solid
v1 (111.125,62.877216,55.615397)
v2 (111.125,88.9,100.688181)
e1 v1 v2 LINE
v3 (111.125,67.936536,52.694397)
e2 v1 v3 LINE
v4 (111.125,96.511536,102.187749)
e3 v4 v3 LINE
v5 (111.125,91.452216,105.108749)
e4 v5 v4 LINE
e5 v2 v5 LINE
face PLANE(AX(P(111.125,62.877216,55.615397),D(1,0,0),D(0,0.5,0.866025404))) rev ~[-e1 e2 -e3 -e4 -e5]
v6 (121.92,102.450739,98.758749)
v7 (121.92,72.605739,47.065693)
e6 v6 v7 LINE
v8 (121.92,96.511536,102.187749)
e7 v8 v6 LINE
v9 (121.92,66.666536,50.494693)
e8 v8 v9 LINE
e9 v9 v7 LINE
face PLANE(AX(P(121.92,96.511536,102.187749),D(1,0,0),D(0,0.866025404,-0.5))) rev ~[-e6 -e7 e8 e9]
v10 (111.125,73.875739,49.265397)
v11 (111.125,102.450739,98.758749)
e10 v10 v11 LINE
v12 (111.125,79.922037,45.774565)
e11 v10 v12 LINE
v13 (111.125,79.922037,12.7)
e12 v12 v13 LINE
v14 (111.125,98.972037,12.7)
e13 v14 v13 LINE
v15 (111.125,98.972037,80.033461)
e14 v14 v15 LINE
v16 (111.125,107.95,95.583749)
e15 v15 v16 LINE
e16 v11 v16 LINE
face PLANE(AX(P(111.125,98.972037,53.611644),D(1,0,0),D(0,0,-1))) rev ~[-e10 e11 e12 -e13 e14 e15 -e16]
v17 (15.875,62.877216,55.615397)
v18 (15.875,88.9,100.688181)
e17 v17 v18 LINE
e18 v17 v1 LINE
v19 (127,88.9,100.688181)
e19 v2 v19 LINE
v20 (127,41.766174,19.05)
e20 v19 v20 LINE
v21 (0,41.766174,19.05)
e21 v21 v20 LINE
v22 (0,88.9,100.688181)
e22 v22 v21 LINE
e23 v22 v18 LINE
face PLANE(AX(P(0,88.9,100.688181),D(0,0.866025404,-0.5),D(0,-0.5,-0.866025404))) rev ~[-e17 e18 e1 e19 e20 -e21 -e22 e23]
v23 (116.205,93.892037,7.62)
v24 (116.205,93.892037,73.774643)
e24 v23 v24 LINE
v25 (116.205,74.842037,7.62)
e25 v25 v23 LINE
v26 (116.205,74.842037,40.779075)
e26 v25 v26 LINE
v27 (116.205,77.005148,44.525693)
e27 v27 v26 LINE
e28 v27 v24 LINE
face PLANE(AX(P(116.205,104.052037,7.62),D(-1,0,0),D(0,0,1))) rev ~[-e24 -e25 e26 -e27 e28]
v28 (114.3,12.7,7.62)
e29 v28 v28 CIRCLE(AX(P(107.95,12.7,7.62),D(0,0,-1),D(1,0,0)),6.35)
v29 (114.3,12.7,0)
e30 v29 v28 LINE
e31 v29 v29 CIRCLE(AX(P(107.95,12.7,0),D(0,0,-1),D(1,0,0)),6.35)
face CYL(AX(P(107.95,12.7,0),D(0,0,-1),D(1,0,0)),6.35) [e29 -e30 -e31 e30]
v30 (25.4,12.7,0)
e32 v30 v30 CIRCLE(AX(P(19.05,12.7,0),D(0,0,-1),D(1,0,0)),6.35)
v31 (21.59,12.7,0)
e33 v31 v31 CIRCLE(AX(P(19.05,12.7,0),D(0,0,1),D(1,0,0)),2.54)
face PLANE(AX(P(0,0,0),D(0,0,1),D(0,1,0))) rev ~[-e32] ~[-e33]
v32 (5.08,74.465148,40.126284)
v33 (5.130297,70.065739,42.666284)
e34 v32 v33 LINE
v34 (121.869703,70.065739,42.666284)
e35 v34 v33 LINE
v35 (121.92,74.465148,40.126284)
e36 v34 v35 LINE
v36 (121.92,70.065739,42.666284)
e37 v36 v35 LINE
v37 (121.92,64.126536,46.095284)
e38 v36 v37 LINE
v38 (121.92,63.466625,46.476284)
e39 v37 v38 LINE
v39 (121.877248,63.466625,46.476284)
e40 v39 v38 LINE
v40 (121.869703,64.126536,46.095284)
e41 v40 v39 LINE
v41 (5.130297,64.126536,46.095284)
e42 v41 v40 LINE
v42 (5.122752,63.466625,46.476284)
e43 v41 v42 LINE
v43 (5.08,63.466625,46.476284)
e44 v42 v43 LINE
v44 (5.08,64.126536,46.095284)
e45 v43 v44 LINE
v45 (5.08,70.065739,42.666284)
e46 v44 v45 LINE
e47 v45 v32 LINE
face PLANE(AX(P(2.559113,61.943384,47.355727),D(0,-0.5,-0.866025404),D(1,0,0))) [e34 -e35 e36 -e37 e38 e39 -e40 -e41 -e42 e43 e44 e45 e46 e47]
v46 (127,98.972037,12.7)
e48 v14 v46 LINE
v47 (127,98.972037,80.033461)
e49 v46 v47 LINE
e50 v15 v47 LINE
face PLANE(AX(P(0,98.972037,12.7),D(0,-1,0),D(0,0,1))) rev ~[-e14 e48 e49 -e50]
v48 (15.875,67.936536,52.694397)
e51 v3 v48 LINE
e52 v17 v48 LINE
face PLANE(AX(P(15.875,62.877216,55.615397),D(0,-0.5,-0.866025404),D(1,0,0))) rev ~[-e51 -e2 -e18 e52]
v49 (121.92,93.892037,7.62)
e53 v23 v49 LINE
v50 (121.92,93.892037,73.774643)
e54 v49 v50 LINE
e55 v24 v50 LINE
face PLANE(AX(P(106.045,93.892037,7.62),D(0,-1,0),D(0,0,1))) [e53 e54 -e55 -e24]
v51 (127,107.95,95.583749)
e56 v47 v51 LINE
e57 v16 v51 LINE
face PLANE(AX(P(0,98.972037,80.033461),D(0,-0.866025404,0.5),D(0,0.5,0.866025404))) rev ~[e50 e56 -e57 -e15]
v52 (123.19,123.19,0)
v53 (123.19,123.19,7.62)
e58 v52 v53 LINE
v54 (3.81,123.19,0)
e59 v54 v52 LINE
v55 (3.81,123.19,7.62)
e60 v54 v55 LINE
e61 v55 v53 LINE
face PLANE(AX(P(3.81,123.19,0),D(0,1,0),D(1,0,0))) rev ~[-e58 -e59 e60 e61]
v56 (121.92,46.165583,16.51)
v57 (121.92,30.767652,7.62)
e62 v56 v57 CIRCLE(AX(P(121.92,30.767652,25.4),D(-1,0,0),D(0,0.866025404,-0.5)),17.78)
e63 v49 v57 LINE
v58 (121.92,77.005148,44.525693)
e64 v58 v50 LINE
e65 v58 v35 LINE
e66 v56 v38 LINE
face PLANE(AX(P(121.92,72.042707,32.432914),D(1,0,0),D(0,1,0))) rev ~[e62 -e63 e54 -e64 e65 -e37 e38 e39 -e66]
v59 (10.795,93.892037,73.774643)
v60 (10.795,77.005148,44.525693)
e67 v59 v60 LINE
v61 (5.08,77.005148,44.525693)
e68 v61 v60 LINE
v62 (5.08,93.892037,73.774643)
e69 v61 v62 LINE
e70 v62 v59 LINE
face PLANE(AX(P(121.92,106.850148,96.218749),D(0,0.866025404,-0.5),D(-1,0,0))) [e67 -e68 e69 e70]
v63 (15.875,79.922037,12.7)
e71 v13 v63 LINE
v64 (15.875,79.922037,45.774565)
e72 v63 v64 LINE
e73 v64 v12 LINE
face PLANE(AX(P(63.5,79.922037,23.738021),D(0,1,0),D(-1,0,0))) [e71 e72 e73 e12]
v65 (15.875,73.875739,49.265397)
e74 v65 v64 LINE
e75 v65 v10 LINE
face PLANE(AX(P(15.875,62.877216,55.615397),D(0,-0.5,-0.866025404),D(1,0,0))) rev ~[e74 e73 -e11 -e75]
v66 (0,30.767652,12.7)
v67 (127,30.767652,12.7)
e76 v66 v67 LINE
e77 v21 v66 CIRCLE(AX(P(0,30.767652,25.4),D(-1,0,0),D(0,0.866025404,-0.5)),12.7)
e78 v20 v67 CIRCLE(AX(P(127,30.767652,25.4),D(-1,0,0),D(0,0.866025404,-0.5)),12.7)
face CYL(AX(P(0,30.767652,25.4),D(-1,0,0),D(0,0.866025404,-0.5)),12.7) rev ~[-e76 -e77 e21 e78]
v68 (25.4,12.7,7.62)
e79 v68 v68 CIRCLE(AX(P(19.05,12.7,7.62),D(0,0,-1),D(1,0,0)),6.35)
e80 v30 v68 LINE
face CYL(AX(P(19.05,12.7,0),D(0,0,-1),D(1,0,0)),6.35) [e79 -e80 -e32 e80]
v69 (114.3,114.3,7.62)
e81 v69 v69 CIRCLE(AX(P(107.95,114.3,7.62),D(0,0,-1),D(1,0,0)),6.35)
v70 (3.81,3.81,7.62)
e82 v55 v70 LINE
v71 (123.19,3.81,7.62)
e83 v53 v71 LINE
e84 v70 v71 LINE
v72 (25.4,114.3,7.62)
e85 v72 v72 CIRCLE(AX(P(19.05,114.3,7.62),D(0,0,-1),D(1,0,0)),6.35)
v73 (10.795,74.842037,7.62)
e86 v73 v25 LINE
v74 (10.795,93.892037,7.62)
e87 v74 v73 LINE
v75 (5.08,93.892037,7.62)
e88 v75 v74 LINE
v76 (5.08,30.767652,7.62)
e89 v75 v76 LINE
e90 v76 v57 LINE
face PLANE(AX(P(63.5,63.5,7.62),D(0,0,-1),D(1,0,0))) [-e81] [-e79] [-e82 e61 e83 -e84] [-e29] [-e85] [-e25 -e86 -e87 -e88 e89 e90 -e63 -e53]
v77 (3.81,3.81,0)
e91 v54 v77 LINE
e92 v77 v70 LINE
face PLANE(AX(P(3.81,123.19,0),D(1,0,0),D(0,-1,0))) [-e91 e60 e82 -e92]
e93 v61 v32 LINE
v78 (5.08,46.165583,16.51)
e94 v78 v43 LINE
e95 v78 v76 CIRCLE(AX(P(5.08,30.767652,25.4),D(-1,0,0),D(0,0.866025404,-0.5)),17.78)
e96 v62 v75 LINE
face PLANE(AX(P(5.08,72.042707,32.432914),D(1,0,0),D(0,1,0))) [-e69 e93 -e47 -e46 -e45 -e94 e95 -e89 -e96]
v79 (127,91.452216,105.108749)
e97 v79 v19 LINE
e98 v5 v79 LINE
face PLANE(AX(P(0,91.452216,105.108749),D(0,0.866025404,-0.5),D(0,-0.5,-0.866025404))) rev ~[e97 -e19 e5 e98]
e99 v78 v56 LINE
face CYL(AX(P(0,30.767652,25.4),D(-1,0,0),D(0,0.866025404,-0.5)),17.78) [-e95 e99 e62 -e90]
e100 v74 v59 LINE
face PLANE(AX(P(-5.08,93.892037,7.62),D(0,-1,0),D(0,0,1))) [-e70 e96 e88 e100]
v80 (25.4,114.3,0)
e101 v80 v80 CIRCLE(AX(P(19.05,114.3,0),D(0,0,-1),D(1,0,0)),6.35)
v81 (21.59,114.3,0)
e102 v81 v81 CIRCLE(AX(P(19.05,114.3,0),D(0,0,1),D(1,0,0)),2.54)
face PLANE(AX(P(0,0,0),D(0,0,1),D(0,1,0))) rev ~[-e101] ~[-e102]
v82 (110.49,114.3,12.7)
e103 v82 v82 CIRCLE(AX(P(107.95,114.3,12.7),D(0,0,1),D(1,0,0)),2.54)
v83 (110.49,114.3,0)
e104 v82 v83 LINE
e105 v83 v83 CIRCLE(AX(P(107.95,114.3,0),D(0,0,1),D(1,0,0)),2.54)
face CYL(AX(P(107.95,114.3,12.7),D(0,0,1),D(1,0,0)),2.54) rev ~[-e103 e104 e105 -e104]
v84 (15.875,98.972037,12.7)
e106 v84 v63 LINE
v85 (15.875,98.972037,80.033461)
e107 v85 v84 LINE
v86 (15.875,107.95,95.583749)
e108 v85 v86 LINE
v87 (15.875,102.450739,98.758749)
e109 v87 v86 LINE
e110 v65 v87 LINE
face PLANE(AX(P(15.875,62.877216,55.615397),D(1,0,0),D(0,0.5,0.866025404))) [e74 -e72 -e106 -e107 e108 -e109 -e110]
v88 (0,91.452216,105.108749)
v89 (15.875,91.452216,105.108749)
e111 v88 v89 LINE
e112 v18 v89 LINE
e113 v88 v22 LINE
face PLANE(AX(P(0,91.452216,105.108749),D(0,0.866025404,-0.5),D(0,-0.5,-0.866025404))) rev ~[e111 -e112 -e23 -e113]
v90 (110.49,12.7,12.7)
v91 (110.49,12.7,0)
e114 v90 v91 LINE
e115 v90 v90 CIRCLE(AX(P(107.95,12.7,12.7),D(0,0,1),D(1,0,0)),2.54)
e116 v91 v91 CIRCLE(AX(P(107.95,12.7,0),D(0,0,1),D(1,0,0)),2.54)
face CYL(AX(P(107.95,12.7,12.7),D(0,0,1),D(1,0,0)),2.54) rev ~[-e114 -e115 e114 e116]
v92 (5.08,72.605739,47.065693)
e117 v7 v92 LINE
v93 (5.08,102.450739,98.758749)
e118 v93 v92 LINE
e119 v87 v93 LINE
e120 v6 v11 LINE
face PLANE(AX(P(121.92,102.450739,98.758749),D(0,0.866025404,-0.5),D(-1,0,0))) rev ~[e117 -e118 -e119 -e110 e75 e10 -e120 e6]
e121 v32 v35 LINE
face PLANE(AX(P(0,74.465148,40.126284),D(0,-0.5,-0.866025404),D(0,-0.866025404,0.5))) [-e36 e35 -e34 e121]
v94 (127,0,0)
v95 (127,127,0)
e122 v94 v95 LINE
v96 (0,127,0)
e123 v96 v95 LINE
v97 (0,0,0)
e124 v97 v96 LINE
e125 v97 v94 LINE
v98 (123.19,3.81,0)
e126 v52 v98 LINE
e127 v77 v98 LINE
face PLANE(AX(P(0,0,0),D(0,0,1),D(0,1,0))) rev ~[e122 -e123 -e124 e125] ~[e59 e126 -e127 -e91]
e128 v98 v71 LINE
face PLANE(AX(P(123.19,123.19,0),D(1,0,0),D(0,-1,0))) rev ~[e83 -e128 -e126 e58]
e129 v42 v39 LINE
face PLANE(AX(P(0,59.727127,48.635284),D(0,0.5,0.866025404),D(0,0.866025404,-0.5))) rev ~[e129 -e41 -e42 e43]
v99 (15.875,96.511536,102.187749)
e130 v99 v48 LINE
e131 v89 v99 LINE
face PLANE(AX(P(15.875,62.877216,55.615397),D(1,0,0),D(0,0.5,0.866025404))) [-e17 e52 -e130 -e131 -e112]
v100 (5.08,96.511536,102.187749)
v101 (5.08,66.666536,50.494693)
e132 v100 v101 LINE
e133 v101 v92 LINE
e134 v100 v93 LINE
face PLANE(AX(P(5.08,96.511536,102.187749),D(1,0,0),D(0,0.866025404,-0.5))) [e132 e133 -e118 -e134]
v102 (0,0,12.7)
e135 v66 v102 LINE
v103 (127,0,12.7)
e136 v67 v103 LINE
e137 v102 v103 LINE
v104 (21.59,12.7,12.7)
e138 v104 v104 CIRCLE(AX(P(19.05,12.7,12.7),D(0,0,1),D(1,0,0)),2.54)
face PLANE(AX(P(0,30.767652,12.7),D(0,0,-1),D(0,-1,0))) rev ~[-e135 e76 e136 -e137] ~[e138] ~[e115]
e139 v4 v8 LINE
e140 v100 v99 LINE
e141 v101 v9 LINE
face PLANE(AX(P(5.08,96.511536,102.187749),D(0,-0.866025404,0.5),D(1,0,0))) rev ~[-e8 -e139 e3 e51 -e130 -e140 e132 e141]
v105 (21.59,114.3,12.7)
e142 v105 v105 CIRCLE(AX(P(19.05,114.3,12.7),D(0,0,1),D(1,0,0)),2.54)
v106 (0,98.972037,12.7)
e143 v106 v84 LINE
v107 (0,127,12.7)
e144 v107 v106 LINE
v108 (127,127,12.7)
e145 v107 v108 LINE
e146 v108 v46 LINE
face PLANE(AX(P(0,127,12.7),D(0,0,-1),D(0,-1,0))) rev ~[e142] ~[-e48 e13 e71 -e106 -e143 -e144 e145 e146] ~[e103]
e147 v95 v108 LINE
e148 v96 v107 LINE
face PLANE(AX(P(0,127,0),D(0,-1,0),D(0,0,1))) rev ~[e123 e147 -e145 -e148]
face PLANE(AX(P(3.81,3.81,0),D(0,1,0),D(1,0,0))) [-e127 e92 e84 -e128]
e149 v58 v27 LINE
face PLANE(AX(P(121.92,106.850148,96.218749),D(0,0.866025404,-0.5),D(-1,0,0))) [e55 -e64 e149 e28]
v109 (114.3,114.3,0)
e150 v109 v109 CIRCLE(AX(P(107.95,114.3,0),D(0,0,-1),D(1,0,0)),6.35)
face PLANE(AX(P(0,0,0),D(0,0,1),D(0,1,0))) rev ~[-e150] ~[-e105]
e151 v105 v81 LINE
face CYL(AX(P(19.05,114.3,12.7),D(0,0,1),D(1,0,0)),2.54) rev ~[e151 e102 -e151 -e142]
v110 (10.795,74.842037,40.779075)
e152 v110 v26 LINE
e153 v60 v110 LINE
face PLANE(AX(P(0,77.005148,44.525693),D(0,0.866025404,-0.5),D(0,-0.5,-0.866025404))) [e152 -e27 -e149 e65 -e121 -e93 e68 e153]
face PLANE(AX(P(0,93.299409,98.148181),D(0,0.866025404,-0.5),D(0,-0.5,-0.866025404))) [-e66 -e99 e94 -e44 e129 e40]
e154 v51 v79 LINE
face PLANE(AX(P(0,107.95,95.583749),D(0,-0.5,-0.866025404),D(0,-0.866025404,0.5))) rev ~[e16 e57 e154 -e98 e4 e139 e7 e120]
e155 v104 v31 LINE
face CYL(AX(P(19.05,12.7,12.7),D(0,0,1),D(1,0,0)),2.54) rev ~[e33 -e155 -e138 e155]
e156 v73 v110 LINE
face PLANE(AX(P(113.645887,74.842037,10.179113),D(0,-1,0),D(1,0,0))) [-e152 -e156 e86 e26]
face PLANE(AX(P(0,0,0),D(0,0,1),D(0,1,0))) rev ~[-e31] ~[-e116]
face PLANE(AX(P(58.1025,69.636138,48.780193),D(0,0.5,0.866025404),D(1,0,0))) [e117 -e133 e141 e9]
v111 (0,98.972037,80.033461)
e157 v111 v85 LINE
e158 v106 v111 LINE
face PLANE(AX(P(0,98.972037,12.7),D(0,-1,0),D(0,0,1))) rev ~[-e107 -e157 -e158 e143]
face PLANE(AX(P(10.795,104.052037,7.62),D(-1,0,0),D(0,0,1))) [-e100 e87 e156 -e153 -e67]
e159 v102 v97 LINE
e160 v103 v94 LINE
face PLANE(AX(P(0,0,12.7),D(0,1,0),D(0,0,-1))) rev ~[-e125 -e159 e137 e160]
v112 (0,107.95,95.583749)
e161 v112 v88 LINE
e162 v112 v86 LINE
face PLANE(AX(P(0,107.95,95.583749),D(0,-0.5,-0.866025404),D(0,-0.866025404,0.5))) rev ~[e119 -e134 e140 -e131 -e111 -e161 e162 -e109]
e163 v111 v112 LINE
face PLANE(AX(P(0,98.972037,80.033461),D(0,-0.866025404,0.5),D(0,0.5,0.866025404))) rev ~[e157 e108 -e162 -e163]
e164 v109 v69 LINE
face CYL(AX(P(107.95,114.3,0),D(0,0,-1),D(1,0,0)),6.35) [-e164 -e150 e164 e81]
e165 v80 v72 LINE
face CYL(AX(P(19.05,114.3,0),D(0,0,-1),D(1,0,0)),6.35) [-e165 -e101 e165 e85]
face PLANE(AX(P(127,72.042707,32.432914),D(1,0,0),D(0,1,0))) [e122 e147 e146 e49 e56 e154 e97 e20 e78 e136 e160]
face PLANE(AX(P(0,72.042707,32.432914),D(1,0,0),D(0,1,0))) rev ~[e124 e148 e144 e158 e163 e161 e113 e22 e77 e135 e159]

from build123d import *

# Parameters (mm, degrees)
F1_DEPTH      = 127
F2_W          = 95.25
F2_H          = 57.15
F3_DEPTH      = 83.3406583964
F4_R          = 2.54
F5_DEPTH      = 12.701
F6_R          = 2.54
F7_DEPTH      = 12.701
F8_W          = 106.045
F8_H          = 6.858
F8_W_2        = 10.795
F9_DEPTH      = 59.69
F10_W         = 95.25
F10_H         = 22.0760425496
F10_H_2       = 18.8356010627
F11_DEPTH     = 19.05
F12_W         = 119.38
F12_H         = 119.38
F12_R         = 6.35
F13_DEPTH     = 7.62
F14_T         = 5.08
F14_T3_DEPTH  = 17.78
F14_T5_DEPTH  = 26.035
F14_T7_DEPTH  = 29.21
F14_T9_DEPTH  = 105.41
F14_T11_DEPTH = 26.035
F14_T13_DEPTH = 17.1416638094
F14_T15_DEPTH = 43.2345651777
F14_T17_DEPTH = 16.002
F14_T19_DEPTH = 69.85
F14_T21_DEPTH = 127
F14_T23_DEPTH = 17.018
F14_T25_DEPTH = 17.018


# Not quite as in the source:
# - a shell that OpenCascade refuses in one call is made with other operations: the cavity is built on its own and cut out


with BuildPart() as f1:
    # F0 (on Right) → F1 (new body)
    with BuildSketch(Plane.YZ):
        with BuildLine():
            Line((0, 12.7), (0, 0))
            Line((0, 0), (127, 0))
            Line((127, 0), (127, 12.7))
            Line((127, 12.7), (98.9720369056, 12.7))
            Line((98.9720369056, 12.7), (98.9720369056, 80.0334606807))
            Line((98.9720369056, 80.0334606807), (107.95, 95.5837489087))
            Line((107.95, 95.5837489087), (91.4522160579, 105.1087489087))
            Line((91.4522160579, 105.1087489087), (88.9, 100.6881810245))
            Line((88.9, 100.6881810245), (41.7661742094, 19.05))
            ThreePointArc((41.7661742094, 19.05), (37.1176515813, 14.4014773719), (30.7676515813, 12.7))
            Line((30.7676515813, 12.7), (0, 12.7))
        make_face()
    extrude(amount=F1_DEPTH)

    # F2 (on face) → F3 (cut, through all)
    with BuildSketch(Plane(origin=(0, 23.075738686, -13.3227839421), x_dir=(1, 0, 0), z_dir=(0, -0.8660254038, 0.5))):
        with Locations((63.5, 108.1779547439)):
            Rectangle(F2_W, F2_H)
    extrude(amount=-F3_DEPTH, mode=Mode.SUBTRACT)

    # F4 (on face) → F5 (cut, through all)
    with BuildSketch(Plane.XY.offset(12.7)):
        with Locations((19.05, 12.7)):
            Circle(F4_R)
        with Locations((107.95, 12.7)):
            Circle(F4_R)
    extrude(amount=-F5_DEPTH, mode=Mode.SUBTRACT)

    # F6 (on face) → F7 (cut, through all)
    with BuildSketch(Plane.XY.offset(12.7)):
        with Locations((19.05, 114.3)):
            Circle(F6_R)
        with Locations((107.95, 114.3)):
            Circle(F6_R)
    extrude(amount=-F7_DEPTH, mode=Mode.SUBTRACT)

    # F8 (on face) → F9 (cut)
    with BuildSketch(Plane(origin=(0, 68.3764773719, 118.4315328508), x_dir=(1, 0, 0), z_dir=(0, 0.5, 0.8660254038))):
        with Locations((58.1025, 35.9165678842)):
            Rectangle(F8_W, F8_H)
        with Locations((116.5225, 35.9165678842)):
            Rectangle(F8_W_2, F8_H)
    extrude(amount=-F9_DEPTH, mode=Mode.SUBTRACT)

    # F10 (on face) → F11 (cut)
    with BuildSketch(Plane(origin=(0, 98.9720369056, 0), x_dir=(-1, 0, 0), z_dir=(0, 1, 0))):
        with Locations((-63.5, 23.7380212748)):
            Rectangle(F10_W, F10_H)
        with Locations((-63.5, 44.193843081)):
            Rectangle(F10_W, F10_H_2)
    extrude(amount=-F11_DEPTH, mode=Mode.SUBTRACT)

    # F12 (on face) → F13 (cut)
    with BuildSketch(Plane(origin=(0, 0, 0), x_dir=(1, 0, 0), z_dir=(0, 0, -1))):
        with Locations((63.5, -63.5)):
            Rectangle(F12_W, F12_H)
        with Locations((19.05, -114.3)):
            Circle(F12_R, mode=Mode.SUBTRACT)
        with Locations((107.95, -114.3)):
            Circle(F12_R, mode=Mode.SUBTRACT)
        with Locations((19.05, -12.7)):
            Circle(F12_R, mode=Mode.SUBTRACT)
        with Locations((107.95, -12.7)):
            Circle(F12_R, mode=Mode.SUBTRACT)
    extrude(amount=-F13_DEPTH, mode=Mode.SUBTRACT)

    # F14: shell of thickness 5.08, made by hand


with BuildPart() as f14_core1:
    # F14_t2: copy of F1
    add(f1.part)

    # the walls: a layer under each face that stays
    f14_faces = [f14_core1.faces().sort_by_distance(p)[0] for p in [
        (63.5, 0, 6.35),
        (63.5, 15.3838257906, 12.7),
        (125.4320987654, 107.15625, 0),
        (0, 63.5, 52.5543744543),
        (127, 63.5, 52.5543744543),
        (63.5, 37.1176515813, 14.4014773719),
        (105.41, 12.7, 6.35),
        (16.51, 12.7, 6.35),
        (63.5, 127, 6.35),
        (3.81, 63.5, 3.81),
        (63.5, 3.81, 3.81),
        (123.19, 63.5, 3.81),
        (63.5, 123.19, 3.81),
        (63.5, 103.4610184528, 12.7),
        (7.9375, 98.9720369056, 46.3667303403),
        (7.9375, 103.4610184528, 87.8086047947),
        (13.2291666667, 105.200369343, 97.1712489087),
        (105.8333333333, 50.0471811841, 33.3931248181),
        (119.0625, 98.9720369056, 46.3667303403),
        (119.0625, 103.4610184528, 87.8086047947),
        (124.3541666667, 105.200369343, 97.1712489087),
        (112.1833333333, 8.4666666667, 0),
        (23.2833333333, 8.4666666667, 0),
        (111.125, 90.912869343, 55.7293744543),
        (63.5, 79.9220369056, 29.2372825889),
        (15.875, 98.3301377958, 51.6049284688),
        (105.41, 114.3, 6.35),
        (16.51, 114.3, 6.35),
        (15.875, 79.6943762624, 78.9015729955),
        (13.4257142857, 68.7983221811, 54.1870537248),
        (5.08, 84.5586375764, 74.6267207327),
        (113.5742857143, 74.7375244003, 50.7580537248),
        (111.125, 79.6943762624, 78.9015729955),
        (63.5, 65.4068762624, 54.1548970824),
        (121.92, 84.5586375764, 74.6267207327),
        (101.6, 12.7, 3.81),
        (12.7, 12.7, 3.81),
        (12.7, 114.3, 3.81),
        (101.6, 114.3, 3.81),
        (63.5, 76.8988877958, 47.5199811301),
        (112.1833333333, 110.0666666667, 0),
        (23.2833333333, 110.0666666667, 0),
        (63.5, 69.6361375764, 48.7801925568),
    ]]
    thicken(f14_faces, amount=-F14_T, mode=Mode.SUBTRACT)

    # F14_s4 → F14_t3 (cut)
    with BuildSketch(Plane.XY.offset(-5.08)):
        Polygon((3.8608, 3.8608), (-1.27, 3.81), (-1.27, -1.27), (3.81, -1.27), align=None)
        Polygon((3.8608, 123.1392), (-1.27, 123.19), (-1.27, 128.27), (3.81, 128.27), align=None)
        Polygon((123.1392, 3.8608), (123.19, -1.27), (128.27, -1.27), (128.27, 3.81), align=None)
        Polygon((123.1392, 123.1392), (128.27, 123.19), (128.27, 128.27), (123.19, 128.27), align=None)
    extrude(amount=F14_T3_DEPTH, mode=Mode.SUBTRACT)

    # F14_s6 → F14_t5 (cut)
    with BuildSketch(Plane.YZ.offset(106.045)):
        Polygon((99.0228369056, 12.7508), (98.9720369056, 7.62), (93.8920369056, 7.62), (93.8920369056, 12.7), align=None)
        Polygon((99.0668309961, 80.0080606807), (93.8920369056, 80.0334606807), (93.8920369056, 81.3946425782), (94.5726278544, 82.5734606807), align=None)
    extrude(amount=F14_T5_DEPTH, mode=Mode.SUBTRACT)

    # F14_s8 → F14_t7 (cut)
    with BuildSketch(Plane.XZ.offset(-104.0520369056)):
        Polygon((111.0742, 12.7508), (111.125, 7.62), (116.205, 7.62), (116.205, 12.7), align=None)
        Polygon((15.9258, 12.7508), (15.875, 7.62), (10.795, 7.62), (10.795, 12.7), align=None)
    extrude(amount=F14_T7_DEPTH, mode=Mode.SUBTRACT)

    # F14_s10 → F14_t9 (cut)
    with BuildSketch(Plane.YZ.offset(10.795)):
        Polygon((79.9728369056, 12.7508), (79.9220369056, 7.62), (74.8420369056, 7.62), (74.8420369056, 12.7), align=None)
    extrude(amount=F14_T9_DEPTH, mode=Mode.SUBTRACT)

    # F14_s12 → F14_t11 (cut)
    with BuildSketch(Plane.YZ.offset(-5.08)):
        Polygon((99.0228369056, 12.7508), (98.9720369056, 7.62), (93.8920369056, 7.62), (93.8920369056, 12.7), align=None)
        Polygon((99.0668309961, 80.0080606807), (93.8920369056, 80.0334606807), (93.8920369056, 81.3946425782), (94.5726278544, 82.5734606807), align=None)
    extrude(amount=F14_T11_DEPTH, mode=Mode.SUBTRACT)

    # F14_s14 → F14_t13 (cut)
    with BuildSketch(Plane(origin=(0, 29.6748522628, -17.1327839421), x_dir=(1, 0, 0), z_dir=(0, 0.8660254038, -0.5))):
        Polygon((111.0742, -79.6537547439), (116.205, -79.6029547439), (116.205, -74.5229547439), (111.125, -74.5229547439), align=None)
        Polygon((15.9258, -79.6537547439), (10.795, -79.6029547439), (10.795, -74.5229547439), (15.875, -74.5229547439), align=None)
    extrude(amount=F14_T13_DEPTH, mode=Mode.SUBTRACT)

    # F14_s16 → F14_t15 (cut)
    with BuildSketch(Plane.XY.offset(7.62)):
        Polygon((111.0742, 79.9728369056), (116.205, 79.9220369056), (116.205, 74.8420369056), (111.125, 74.8420369056), align=None)
        Polygon((15.9258, 79.9728369056), (15.875, 74.8420369056), (10.795, 74.8420369056), (10.795, 79.9220369056), align=None)
    extrude(amount=F14_T15_DEPTH, mode=Mode.SUBTRACT)

    # F14_s18 → F14_t17 (cut)
    with BuildSketch(Plane(origin=(0, 18.6763296347, -10.7827839421), x_dir=(1, 0, 0), z_dir=(0, 0.8660254038, -0.5))):
        Polygon((15.9258, -79.6537547439), (10.795, -79.6029547439), (10.795, -74.5229547439), (15.875, -74.5229547439), align=None)
        Polygon((111.0742, -79.6537547439), (116.205, -79.6029547439), (116.205, -74.5229547439), (111.125, -74.5229547439), align=None)
    extrude(amount=F14_T17_DEPTH, mode=Mode.SUBTRACT)

    # F14_s20 → F14_t19 (cut)
    with BuildSketch(Plane(origin=(0, 70.9164773719, 122.830941902), x_dir=(1, 0, 0), z_dir=(0, -0.5, -0.8660254038))):
        Polygon((121.8692, -32.5383678842), (121.92, -27.4075678842), (127, -27.4075678842), (127, -32.4875678842), align=None)
        Polygon((5.1308, -32.5383678842), (5.08, -27.4075678842), (0, -27.4075678842), (0, -32.4875678842), align=None)
        Polygon((5.1308, -39.2947678842), (0, -39.3455678842), (0, -44.4255678842), (5.08, -44.4255678842), align=None)
        Polygon((121.8692, -39.2947678842), (121.92, -44.4255678842), (127, -44.4255678842), (127, -39.3455678842), align=None)
    extrude(amount=F14_T19_DEPTH, mode=Mode.SUBTRACT)

    # F14_s22 → F14_t21 (cut)
    with BuildSketch(Plane.YZ):
        Polygon((66.7359305573, 50.5132866473), (62.2671274156, 53.0346925568), (59.7271274156, 48.6352835056), (64.1265364668, 46.0952835056), align=None)
        Polygon((72.5871445955, 47.1350866473), (77.0051477372, 44.5256925568), (74.4651477372, 40.1262835056), (70.065738686, 42.6662835056), align=None)
    extrude(amount=F14_T21_DEPTH, mode=Mode.SUBTRACT)

    # F14_s24 → F14_t23 (cut)
    with BuildSketch(Plane(origin=(0, 38.4736703653, -22.2127839421), x_dir=(1, 0, 0), z_dir=(0, -0.8660254038, 0.5))):
        Polygon((5.1308, 77.1137547439), (0, 77.0629547439), (0, 71.9829547439), (5.08, 71.9829547439), align=None)
    extrude(amount=F14_T23_DEPTH, mode=Mode.SUBTRACT)

    # F14_s26 → F14_t25 (cut)
    with BuildSketch(Plane(origin=(0, 23.7356500437, -13.7037839421), x_dir=(1, 0, 0), z_dir=(0, 0.8660254038, -0.5))):
        Polygon((121.8692, -77.1137547439), (127, -77.0629547439), (127, -71.9829547439), (121.92, -71.9829547439), align=None)
    extrude(amount=F14_T25_DEPTH, mode=Mode.SUBTRACT)


with BuildPart() as f1_1:
    add(f1.part)

    # what is left inside the walls is the cavity
    f14_cavity = [f14_core1.part.solids().sort_by_distance(p)[0] for p in [
        (63.5, 72.850575, 7.6708),
    ]]
    add(f14_cavity, mode=Mode.SUBTRACT)


solid = f1_1.part
